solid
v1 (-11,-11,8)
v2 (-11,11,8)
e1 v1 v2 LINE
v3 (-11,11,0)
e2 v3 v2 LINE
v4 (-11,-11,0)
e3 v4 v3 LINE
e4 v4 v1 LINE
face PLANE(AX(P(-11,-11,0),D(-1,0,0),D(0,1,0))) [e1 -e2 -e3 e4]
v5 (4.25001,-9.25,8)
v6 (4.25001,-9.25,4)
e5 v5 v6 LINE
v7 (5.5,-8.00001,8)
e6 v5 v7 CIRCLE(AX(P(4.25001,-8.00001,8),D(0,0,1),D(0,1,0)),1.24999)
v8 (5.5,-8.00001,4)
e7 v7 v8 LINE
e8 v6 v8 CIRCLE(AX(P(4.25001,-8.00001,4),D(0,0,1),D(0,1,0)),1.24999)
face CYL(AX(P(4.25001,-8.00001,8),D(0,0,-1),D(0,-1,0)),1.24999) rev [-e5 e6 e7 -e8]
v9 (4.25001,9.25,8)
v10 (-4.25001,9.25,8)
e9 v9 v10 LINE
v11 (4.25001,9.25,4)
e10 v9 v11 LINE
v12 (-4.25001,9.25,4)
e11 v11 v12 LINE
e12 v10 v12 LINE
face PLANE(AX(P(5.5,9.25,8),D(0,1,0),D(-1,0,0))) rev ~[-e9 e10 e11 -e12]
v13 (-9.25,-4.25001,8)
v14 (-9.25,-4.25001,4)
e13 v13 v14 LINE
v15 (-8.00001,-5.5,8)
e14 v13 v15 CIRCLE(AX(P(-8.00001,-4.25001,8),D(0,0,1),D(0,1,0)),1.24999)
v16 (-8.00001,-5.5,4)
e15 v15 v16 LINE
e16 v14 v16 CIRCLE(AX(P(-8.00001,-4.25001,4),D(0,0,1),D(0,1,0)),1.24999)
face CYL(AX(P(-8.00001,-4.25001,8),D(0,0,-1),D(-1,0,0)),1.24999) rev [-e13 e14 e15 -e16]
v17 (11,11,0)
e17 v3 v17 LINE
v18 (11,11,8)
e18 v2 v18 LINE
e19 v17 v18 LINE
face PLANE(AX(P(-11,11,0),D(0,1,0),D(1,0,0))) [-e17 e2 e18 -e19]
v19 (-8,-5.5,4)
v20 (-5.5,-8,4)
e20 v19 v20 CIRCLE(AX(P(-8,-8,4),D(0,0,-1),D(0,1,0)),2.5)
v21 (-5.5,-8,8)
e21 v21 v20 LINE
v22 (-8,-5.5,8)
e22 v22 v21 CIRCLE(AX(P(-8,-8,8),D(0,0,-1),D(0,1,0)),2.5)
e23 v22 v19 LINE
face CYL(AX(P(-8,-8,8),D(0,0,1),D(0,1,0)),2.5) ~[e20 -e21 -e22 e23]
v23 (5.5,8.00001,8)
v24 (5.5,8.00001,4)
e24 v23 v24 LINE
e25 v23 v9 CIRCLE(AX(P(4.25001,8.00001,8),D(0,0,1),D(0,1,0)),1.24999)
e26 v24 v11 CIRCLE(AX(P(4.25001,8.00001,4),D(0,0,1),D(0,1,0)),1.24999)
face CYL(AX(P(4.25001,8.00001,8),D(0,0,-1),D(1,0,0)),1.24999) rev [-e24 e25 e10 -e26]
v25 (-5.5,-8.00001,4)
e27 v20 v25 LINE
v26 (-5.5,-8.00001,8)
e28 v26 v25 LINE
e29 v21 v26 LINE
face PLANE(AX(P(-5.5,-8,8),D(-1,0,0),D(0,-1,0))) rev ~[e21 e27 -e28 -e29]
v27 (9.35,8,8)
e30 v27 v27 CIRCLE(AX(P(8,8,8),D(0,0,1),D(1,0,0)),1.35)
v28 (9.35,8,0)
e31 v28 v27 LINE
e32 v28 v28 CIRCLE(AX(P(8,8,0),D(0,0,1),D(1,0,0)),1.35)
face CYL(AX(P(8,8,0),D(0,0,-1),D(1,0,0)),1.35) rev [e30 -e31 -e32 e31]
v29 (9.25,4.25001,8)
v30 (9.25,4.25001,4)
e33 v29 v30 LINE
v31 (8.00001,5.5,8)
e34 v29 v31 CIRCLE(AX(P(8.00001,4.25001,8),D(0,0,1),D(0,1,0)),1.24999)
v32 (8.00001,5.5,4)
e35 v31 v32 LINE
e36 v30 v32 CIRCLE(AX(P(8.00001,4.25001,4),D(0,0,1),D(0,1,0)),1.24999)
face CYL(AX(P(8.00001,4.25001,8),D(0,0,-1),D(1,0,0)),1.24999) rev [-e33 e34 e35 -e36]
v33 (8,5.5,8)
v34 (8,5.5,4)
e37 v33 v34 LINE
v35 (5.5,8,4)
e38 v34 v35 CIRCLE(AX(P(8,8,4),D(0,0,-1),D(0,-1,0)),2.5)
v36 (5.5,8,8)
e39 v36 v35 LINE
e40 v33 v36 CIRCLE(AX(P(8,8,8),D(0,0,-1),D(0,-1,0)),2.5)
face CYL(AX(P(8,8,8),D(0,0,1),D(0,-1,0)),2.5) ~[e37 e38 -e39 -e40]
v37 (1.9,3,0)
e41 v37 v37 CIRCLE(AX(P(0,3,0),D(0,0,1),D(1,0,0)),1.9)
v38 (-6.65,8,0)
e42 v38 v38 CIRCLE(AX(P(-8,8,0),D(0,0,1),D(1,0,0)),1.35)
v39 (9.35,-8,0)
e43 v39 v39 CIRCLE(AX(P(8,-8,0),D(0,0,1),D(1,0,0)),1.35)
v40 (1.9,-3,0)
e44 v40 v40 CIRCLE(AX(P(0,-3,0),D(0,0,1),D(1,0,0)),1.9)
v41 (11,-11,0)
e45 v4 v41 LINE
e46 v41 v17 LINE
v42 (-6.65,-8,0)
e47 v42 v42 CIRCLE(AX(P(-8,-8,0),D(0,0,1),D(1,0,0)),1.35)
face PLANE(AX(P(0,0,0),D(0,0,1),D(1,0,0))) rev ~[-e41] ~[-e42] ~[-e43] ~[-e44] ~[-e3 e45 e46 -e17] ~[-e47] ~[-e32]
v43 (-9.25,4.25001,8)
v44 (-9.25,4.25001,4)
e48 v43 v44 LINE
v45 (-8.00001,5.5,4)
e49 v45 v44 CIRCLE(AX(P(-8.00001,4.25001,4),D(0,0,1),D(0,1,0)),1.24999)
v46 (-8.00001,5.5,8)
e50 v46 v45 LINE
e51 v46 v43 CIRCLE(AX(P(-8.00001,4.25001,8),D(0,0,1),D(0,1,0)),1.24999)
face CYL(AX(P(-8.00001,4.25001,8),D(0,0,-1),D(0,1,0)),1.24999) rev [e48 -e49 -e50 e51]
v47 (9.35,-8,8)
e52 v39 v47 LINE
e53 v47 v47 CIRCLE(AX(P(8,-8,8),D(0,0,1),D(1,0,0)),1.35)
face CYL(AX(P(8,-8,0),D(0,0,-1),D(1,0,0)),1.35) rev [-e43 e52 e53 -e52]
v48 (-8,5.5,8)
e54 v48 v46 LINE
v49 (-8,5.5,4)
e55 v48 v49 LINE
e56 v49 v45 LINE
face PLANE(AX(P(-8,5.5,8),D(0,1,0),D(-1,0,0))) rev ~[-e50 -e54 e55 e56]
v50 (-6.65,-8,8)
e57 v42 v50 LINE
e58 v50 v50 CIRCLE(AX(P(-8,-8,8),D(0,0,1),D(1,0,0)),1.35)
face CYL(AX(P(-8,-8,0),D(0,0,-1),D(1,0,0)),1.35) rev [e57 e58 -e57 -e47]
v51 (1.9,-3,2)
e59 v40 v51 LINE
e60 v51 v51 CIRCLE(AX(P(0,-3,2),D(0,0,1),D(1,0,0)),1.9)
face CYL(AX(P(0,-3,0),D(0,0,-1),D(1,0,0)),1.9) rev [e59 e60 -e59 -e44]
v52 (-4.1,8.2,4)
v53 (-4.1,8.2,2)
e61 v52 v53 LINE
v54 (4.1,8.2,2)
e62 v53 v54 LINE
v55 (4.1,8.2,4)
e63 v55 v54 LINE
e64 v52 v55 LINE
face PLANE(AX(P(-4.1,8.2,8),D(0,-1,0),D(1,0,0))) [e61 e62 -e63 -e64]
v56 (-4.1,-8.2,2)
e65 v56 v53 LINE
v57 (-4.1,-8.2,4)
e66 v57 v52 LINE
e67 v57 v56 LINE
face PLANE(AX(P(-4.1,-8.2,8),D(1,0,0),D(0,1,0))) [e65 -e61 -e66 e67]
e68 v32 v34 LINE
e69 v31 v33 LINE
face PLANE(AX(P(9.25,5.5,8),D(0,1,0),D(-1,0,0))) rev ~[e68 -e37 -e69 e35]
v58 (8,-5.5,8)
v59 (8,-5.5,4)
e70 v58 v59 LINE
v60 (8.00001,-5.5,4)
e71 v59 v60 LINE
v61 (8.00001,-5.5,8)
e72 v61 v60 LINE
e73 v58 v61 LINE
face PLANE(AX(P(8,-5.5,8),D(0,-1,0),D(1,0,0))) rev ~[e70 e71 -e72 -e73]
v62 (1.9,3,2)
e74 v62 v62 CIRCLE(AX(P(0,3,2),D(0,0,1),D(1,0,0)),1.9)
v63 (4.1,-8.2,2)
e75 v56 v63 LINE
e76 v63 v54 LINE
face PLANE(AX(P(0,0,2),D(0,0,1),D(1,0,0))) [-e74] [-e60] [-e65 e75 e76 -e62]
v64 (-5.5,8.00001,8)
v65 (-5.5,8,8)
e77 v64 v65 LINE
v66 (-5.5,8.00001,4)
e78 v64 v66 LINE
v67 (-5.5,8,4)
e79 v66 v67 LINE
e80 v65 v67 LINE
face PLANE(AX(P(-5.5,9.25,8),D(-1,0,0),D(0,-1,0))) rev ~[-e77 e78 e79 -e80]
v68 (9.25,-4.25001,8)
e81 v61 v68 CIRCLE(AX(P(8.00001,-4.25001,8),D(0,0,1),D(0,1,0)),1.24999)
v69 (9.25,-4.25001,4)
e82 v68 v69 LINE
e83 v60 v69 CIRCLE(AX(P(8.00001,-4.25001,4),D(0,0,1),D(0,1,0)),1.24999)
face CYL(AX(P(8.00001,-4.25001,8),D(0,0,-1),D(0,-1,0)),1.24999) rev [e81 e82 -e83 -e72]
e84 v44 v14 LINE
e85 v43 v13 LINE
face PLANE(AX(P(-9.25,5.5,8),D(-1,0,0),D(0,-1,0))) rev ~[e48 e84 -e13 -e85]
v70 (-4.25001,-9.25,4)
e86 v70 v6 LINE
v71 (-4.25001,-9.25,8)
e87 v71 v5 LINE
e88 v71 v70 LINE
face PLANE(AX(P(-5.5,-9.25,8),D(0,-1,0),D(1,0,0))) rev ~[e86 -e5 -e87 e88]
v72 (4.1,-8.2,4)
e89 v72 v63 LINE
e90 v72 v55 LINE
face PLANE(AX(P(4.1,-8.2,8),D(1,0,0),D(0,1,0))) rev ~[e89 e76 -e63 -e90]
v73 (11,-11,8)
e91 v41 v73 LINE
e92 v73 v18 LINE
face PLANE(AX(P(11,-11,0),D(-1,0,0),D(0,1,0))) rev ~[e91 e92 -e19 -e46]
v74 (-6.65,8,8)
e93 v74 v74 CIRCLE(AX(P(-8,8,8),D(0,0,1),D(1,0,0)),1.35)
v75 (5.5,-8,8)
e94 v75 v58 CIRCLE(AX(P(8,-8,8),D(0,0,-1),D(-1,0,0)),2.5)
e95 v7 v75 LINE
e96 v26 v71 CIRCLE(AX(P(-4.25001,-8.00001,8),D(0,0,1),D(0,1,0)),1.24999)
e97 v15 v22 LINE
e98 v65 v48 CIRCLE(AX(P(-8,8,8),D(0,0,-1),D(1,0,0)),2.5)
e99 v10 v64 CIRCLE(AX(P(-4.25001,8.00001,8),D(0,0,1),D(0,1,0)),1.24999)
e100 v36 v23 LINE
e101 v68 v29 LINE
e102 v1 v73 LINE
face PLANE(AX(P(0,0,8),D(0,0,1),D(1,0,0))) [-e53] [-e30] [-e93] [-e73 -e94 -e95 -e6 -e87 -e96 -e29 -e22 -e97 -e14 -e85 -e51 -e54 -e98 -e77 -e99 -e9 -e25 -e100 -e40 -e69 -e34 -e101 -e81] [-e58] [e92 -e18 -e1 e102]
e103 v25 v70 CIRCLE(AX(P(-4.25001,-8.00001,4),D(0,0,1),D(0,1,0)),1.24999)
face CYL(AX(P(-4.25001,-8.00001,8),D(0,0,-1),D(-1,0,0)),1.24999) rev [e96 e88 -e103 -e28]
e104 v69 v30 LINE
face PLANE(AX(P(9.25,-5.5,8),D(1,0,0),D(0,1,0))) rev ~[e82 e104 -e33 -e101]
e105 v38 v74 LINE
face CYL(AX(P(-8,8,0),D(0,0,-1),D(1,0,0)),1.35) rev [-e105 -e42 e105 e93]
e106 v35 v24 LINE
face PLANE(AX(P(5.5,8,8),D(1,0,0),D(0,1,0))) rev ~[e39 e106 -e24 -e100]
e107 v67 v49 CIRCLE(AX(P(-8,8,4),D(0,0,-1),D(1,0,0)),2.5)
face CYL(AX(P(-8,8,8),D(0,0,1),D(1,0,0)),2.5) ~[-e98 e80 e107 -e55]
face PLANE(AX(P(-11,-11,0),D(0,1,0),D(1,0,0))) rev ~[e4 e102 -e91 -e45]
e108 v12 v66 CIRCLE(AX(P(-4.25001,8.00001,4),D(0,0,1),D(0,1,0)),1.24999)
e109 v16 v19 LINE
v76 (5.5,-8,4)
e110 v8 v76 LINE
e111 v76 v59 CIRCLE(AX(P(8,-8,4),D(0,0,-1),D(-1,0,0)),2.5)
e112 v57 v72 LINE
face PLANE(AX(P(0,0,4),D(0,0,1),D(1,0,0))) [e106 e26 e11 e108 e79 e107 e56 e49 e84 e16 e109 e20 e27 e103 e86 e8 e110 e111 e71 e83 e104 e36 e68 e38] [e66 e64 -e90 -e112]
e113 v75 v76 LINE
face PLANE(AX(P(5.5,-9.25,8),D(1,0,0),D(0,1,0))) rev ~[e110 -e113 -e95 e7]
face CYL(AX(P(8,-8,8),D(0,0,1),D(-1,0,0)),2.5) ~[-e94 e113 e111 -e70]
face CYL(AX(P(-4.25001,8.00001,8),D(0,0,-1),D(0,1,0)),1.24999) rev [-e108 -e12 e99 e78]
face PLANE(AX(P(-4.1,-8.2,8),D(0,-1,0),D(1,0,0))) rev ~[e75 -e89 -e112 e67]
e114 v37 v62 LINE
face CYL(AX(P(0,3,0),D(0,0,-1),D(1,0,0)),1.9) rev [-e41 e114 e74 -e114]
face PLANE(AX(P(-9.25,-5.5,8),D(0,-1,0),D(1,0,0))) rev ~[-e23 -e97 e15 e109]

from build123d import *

# Parameters (mm, degrees)
F0_W     = 22
F0_H     = 22
F0_R     = 1.35
F0_R_2   = 1.9
F1_DEPTH = 8
F2_W     = 8.2
F2_H     = 16.4
F2_R     = 1.9
F3_DEPTH = 6
F4_DEPTH = 4
F5_R     = 1.24999


# Not quite as in the source:
# - a fillet or chamfer is up to 0.001 mm smaller than in the source, because OpenCascade refuses the exact size


with BuildPart() as f1:
    # F0 (on Top) → F1 (new body)
    with BuildSketch(Plane.XY):
        Rectangle(F0_W, F0_H)
        with Locations((-8, -8)):
            Circle(F0_R, mode=Mode.SUBTRACT)
        with Locations((8, -8)):
            Circle(F0_R, mode=Mode.SUBTRACT)
        with Locations((0, -3)):
            Circle(F0_R_2, mode=Mode.SUBTRACT)
        with Locations((-8, 8)):
            Circle(F0_R, mode=Mode.SUBTRACT)
        with Locations((0, 3)):
            Circle(F0_R_2, mode=Mode.SUBTRACT)
        with Locations((8, 8)):
            Circle(F0_R, mode=Mode.SUBTRACT)
    extrude(amount=F1_DEPTH)

    # F2 (on face) → F3 (cut)
    with BuildSketch(Plane.XY.offset(8)):
        Rectangle(F2_W, F2_H)
        with Locations((0, -3)):
            Circle(F2_R, mode=Mode.SUBTRACT)
        with Locations((0, 3)):
            Circle(F2_R, mode=Mode.SUBTRACT)
    extrude(amount=-F3_DEPTH, mode=Mode.SUBTRACT)

    # F2 (on face) → F4 (cut)
    with BuildSketch(Plane.XY.offset(8)):
        with BuildLine():
            ThreePointArc((-5.5, 8), (-6.232233047, 6.232233047), (-8, 5.5))
            Line((-8, 5.5), (-9.25, 5.5))
            Line((-9.25, 5.5), (-9.25, -5.5))
            Line((-9.25, -5.5), (-8, -5.5))
            ThreePointArc((-8, -5.5), (-6.232233047, -6.232233047), (-5.5, -8))
            Line((-5.5, -8), (-5.5, -9.25))
            Line((-5.5, -9.25), (5.5, -9.25))
            Line((5.5, -9.25), (5.5, -8))
            ThreePointArc((5.5, -8), (6.232233047, -6.232233047), (8, -5.5))
            Line((8, -5.5), (9.25, -5.5))
            Line((9.25, -5.5), (9.25, 5.5))
            Line((9.25, 5.5), (8, 5.5))
            ThreePointArc((8, 5.5), (6.232233047, 6.232233047), (5.5, 8))
            Line((5.5, 8), (5.5, 9.25))
            Line((5.5, 9.25), (-5.5, 9.25))
            Line((-5.5, 9.25), (-5.5, 8))
        make_face()
        Rectangle(F2_W, F2_H, mode=Mode.SUBTRACT)
    extrude(amount=-F4_DEPTH, mode=Mode.SUBTRACT)

    # F5 (radius 1.25 in the source; OpenCascade refuses exactly that, so slightly less here)
    f5_edges = [f1.edges().sort_by_distance(p)[0] for p in [
        (-9.25, 5.5, 6),
        (-5.5, 9.25, 6),
        (5.5, 9.25, 6),
        (9.25, 5.5, 6),
        (-9.25, -5.5, 6),
        (-5.5, -9.25, 6),
        (5.5, -9.25, 6),
        (9.25, -5.5, 6),
    ]]
    fillet(f5_edges, radius=F5_R)


solid = f1.part
